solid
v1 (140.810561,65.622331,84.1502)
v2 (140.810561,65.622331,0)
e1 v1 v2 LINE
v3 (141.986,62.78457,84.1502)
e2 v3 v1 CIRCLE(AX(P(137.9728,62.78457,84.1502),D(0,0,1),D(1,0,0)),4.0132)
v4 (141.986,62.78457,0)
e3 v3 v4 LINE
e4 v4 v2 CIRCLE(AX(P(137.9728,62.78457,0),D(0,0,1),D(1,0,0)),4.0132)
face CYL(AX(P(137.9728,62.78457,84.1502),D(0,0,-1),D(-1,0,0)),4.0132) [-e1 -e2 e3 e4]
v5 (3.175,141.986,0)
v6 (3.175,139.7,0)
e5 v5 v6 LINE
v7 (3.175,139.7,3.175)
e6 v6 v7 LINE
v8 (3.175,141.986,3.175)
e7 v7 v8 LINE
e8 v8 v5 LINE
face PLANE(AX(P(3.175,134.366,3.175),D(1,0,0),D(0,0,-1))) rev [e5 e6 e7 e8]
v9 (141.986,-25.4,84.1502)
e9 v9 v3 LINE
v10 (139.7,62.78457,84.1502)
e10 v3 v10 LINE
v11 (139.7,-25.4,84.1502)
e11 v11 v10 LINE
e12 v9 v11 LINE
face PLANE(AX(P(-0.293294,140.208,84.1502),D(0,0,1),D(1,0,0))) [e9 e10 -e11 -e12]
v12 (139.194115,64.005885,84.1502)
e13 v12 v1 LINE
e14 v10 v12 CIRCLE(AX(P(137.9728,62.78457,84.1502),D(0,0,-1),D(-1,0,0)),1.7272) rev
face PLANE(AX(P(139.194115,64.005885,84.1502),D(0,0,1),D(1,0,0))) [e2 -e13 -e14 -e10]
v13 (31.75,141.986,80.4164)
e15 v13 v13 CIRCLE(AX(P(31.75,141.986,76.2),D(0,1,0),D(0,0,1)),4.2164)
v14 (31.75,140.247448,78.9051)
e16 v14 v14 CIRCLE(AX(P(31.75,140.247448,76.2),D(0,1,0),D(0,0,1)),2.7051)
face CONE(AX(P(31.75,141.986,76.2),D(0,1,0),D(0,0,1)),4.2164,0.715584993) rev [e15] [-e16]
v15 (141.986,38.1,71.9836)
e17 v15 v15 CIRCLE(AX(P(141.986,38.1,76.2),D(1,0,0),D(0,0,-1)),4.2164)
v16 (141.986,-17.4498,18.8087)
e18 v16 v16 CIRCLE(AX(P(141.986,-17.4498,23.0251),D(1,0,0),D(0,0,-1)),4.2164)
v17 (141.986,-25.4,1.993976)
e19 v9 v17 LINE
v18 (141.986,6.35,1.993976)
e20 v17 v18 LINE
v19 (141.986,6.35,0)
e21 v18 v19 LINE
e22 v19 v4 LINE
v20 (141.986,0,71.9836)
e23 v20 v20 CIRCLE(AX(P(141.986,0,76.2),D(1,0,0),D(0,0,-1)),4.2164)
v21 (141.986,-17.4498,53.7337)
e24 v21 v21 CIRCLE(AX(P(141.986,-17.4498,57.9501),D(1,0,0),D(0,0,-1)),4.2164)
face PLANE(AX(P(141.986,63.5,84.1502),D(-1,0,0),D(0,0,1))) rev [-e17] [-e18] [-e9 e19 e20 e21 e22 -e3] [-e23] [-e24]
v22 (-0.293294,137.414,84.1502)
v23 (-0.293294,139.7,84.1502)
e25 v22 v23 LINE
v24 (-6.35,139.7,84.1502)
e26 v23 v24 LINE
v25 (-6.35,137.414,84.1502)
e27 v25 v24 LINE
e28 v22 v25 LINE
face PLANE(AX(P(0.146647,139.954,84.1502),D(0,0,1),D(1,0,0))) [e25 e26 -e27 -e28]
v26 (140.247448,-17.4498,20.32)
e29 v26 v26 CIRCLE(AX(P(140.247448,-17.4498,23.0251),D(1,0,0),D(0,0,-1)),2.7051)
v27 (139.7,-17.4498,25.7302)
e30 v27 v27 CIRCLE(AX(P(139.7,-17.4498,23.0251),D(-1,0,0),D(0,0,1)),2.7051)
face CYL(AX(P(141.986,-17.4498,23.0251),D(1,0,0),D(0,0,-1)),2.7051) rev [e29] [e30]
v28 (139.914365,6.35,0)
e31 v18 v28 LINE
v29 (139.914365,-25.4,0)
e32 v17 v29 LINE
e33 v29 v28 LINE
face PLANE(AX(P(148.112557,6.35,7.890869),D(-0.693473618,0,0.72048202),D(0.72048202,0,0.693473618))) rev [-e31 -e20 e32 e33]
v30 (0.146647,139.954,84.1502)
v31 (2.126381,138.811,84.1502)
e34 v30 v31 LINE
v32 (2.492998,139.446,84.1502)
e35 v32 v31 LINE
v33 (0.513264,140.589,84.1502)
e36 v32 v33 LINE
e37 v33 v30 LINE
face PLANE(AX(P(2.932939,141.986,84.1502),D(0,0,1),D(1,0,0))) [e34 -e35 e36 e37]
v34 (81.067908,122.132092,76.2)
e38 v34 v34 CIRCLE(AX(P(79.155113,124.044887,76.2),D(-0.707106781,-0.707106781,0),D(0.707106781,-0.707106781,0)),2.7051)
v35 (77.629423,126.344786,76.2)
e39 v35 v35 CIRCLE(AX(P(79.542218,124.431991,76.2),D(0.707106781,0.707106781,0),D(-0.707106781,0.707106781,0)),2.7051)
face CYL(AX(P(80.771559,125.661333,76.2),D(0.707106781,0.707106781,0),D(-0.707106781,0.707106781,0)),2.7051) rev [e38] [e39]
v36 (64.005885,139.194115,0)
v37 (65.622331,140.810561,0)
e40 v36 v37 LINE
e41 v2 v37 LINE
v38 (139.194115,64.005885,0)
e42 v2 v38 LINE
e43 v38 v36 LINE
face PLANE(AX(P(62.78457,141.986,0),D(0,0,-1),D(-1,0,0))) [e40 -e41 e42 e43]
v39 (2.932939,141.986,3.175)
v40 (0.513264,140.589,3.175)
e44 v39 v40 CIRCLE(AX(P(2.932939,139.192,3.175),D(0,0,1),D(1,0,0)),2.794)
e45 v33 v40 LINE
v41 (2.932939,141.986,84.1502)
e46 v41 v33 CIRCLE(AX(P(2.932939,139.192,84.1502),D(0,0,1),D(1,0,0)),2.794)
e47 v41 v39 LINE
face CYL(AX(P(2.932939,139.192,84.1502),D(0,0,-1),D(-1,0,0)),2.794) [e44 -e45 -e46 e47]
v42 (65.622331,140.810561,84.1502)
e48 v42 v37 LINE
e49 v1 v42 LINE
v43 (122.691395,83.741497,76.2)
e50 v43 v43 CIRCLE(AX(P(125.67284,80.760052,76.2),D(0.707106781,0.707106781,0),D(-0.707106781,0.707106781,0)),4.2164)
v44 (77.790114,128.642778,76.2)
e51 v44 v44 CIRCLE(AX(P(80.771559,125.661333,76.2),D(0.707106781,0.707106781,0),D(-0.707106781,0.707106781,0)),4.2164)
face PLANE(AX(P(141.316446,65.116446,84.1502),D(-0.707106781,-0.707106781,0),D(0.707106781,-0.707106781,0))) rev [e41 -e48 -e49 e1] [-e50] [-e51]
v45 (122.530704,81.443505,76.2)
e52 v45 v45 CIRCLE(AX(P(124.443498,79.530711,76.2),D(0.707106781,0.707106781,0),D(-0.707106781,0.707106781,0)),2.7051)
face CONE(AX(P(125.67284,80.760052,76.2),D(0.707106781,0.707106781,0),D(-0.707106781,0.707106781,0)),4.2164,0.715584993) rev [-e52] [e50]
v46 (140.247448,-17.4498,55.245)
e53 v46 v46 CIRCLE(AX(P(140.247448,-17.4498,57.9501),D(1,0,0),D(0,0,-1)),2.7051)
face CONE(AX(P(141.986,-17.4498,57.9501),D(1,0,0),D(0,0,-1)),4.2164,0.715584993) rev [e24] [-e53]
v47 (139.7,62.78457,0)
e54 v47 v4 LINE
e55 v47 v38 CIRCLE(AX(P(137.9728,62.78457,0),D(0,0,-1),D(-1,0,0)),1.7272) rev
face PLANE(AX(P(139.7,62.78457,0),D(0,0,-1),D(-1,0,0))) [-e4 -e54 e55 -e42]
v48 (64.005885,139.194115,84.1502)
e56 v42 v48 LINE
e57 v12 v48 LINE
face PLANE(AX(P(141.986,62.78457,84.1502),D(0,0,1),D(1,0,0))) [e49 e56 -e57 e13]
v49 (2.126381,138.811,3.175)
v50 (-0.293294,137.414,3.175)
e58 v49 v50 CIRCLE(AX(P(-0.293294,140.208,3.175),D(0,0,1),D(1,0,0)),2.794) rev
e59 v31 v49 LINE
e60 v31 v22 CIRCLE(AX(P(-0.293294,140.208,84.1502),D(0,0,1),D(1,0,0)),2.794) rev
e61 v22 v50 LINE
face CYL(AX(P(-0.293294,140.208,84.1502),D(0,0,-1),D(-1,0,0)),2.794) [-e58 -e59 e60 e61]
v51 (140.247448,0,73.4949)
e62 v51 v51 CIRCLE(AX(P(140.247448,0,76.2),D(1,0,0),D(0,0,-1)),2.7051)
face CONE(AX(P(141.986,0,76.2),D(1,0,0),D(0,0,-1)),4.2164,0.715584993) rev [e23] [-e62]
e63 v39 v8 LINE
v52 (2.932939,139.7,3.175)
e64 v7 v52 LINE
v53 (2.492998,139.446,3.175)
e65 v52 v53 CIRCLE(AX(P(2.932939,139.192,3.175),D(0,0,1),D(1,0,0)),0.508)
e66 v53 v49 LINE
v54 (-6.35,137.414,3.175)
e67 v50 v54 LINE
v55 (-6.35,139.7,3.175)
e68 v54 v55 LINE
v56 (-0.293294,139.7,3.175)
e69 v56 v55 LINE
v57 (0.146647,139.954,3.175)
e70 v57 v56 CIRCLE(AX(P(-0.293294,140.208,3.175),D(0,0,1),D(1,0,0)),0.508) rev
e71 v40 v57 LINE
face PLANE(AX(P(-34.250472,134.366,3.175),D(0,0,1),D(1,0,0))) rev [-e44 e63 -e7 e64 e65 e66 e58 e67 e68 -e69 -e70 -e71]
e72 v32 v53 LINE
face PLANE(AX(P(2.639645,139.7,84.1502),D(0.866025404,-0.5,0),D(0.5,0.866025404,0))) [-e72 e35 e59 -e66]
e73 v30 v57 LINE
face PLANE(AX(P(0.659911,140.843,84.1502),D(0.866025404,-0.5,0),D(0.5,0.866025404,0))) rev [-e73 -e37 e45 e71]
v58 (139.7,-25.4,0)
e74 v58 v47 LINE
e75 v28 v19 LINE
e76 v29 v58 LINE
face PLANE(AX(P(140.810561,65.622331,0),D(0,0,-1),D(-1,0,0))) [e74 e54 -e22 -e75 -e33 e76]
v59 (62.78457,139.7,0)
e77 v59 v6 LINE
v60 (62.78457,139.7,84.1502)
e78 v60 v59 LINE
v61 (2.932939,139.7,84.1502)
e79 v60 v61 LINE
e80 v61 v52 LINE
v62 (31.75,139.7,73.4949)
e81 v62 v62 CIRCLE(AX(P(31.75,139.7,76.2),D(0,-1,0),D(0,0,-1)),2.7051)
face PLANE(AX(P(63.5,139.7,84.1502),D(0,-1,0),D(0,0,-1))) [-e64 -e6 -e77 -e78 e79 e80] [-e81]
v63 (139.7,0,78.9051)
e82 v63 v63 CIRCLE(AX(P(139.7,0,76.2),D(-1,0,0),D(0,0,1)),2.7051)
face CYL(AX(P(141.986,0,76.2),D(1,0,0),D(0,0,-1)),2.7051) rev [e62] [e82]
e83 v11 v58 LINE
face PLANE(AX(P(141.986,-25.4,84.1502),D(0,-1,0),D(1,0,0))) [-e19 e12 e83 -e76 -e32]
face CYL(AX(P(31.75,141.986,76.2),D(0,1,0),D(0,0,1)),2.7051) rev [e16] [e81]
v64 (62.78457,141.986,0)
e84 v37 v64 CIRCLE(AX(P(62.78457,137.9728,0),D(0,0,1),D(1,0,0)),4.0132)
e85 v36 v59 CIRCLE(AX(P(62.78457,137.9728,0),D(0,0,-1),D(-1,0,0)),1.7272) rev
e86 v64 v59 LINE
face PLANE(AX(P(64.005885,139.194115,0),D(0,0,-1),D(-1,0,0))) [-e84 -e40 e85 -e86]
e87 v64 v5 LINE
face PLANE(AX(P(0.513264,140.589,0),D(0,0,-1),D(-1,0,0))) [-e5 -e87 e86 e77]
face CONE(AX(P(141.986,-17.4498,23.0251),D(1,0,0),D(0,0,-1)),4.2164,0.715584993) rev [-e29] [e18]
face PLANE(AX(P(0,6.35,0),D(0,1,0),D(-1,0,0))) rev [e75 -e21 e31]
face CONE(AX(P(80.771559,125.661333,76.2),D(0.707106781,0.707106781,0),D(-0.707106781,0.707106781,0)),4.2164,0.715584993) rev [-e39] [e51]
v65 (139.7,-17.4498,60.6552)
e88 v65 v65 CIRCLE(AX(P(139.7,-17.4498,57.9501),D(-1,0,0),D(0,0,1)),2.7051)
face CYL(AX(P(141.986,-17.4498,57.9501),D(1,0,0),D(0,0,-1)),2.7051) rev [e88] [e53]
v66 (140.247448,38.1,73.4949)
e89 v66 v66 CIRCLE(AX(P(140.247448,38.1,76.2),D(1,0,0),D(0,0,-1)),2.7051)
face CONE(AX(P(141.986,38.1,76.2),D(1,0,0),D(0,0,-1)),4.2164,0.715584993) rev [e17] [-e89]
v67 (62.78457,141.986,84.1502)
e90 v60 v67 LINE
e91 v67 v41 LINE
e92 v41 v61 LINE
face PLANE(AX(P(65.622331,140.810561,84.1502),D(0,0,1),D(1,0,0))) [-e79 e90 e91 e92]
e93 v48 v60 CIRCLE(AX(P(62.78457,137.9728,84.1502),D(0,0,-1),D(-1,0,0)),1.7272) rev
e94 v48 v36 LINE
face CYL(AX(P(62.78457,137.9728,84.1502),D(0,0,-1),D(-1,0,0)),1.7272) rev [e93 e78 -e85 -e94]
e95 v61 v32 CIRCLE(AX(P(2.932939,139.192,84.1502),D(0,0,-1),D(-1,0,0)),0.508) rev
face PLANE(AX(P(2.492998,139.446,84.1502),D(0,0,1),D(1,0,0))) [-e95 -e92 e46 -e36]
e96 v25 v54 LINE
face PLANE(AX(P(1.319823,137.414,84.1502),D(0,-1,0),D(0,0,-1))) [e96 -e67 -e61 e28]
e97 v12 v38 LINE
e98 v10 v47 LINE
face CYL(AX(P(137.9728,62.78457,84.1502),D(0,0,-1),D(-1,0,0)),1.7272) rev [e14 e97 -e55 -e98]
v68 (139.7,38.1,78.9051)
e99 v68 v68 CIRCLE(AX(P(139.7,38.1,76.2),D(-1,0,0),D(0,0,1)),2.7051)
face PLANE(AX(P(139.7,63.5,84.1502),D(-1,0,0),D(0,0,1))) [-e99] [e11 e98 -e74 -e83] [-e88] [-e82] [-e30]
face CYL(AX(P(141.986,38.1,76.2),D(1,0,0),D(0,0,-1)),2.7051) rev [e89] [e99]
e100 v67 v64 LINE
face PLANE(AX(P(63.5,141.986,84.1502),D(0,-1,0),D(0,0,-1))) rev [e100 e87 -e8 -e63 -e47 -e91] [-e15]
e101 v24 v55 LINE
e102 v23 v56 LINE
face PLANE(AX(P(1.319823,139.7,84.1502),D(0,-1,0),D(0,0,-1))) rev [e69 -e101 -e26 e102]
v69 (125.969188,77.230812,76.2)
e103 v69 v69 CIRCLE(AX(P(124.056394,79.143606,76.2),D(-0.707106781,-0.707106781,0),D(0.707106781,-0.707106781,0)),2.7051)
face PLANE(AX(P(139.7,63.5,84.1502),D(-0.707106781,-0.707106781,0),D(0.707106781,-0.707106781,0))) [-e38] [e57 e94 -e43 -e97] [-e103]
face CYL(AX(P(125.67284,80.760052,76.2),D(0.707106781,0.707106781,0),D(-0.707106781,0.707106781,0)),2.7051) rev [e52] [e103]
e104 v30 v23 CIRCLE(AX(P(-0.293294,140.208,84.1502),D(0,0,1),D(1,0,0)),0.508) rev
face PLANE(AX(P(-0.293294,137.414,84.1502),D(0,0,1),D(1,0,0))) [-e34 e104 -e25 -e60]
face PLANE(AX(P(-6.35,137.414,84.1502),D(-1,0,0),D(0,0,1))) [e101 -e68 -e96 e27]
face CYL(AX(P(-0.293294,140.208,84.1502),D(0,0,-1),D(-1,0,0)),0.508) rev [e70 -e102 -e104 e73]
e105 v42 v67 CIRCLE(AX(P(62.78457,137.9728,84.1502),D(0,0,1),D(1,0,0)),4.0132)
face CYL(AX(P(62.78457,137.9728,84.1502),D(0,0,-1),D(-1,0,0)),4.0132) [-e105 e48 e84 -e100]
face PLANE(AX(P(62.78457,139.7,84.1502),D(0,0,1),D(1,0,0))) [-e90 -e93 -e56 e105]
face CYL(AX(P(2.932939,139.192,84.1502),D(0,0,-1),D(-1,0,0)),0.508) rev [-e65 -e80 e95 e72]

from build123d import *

# Parameters (mm, degrees)
BASE_FLANGE1_DEPTH                            = 84.1502
CSK_FOR_8_FLAT_HEAD_MACHINE_SCREW1_AT_2_COUNT = 2
CSK_FOR_8_FLAT_HEAD_MACHINE_SCREW1_AT_2_PITCH = 34.925
CSK_FOR_8_FLAT_HEAD_MACHINE_SCREW2_AT_2_COUNT = 2
CSK_FOR_8_FLAT_HEAD_MACHINE_SCREW2_AT_2_PITCH = 38.1
CSK_FOR_8_FLAT_HEAD_MACHINE_SCREW3_AT_2_COUNT = 2
CSK_FOR_8_FLAT_HEAD_MACHINE_SCREW3_AT_2_PITCH = 63.5
SKETCH13_W                                    = 37.425471778
SKETCH13_H                                    = 23.818222608
CUT_EXTRUDE2_DEPTH                            = 7.62
CUT_EXTRUDE3_DEPTH                            = 31.75


# Read off the part's stored shape, not the designer's step: Base-Flange1
with BuildPart() as part:
    # Base-Flange1 outline → Base-Flange1 (new body)
    with BuildSketch(Plane.XY):
        with BuildLine():
            Line((-0.293293937, 139.7), (-6.35, 139.7))
            Line((-6.35, 139.7), (-6.35, 137.414))
            Line((-6.35, 137.414), (-0.293293937, 137.414))
            ThreePointArc((-0.293293937, 137.414), (1.103706063, 137.788325022), (2.126381041, 138.811))
            Line((2.126381041, 138.811), (2.492998462, 139.446))
            ThreePointArc((2.492998462, 139.446), (2.678939367, 139.631940905), (2.932939367, 139.7))
            Line((2.932939367, 139.7), (62.784570335, 139.7))
            ThreePointArc((62.784570335, 139.7), (63.44554116, 139.568524729), (64.005885168, 139.194114832))
            Line((64.005885168, 139.194114832), (139.194114832, 64.005885168))
            ThreePointArc((139.194114832, 64.005885168), (139.568524729, 63.44554116), (139.7, 62.784570335))
            Line((139.7, 62.784570335), (139.7, -25.4))
            Line((139.7, -25.4), (141.986, -25.4))
            Line((141.986, -25.4), (141.986, 62.784570335))
            ThreePointArc((141.986, 62.784570335), (141.68051334, 64.320355486), (140.810560934, 65.622331269))
            Line((140.810560934, 65.622331269), (65.622331269, 140.810560934))
            ThreePointArc((65.622331269, 140.810560934), (64.320355486, 141.68051334), (62.784570335, 141.986))
            Line((62.784570335, 141.986), (2.932939367, 141.986))
            ThreePointArc((2.932939367, 141.986), (1.535939367, 141.611674978), (0.513264389, 140.589))
            Line((0.513264389, 140.589), (0.146646968, 139.954))
            ThreePointArc((0.146646968, 139.954), (-0.039293937, 139.768059095), (-0.293293937, 139.7))
        make_face()
    extrude(amount=BASE_FLANGE1_DEPTH)

    # Sketch2 → CSK for #8 Flat Head Machine Screw1 (revolve, cut)
    with BuildSketch(Plane(origin=(141.986, -17.4498, 57.9501), x_dir=(0, 0, -1), z_dir=(0, 1, 0))):
        Polygon((0, 0), (0, 2.286), (2.7051, 2.286), (2.7051, 1.738551774), (4.2164, 0), align=None)
    csk_for_8_flat_head_machine_screw1 = revolve(axis=Axis((148.336, -17.4498, 57.9501), (-1, 0, 0)), mode=Mode.SUBTRACT)

    # CSK for #8 Flat Head Machine Screw1 at 2: CSK for #8 Flat Head Machine Screw1 ×2
    with Locations(*[(0, 0, -i * CSK_FOR_8_FLAT_HEAD_MACHINE_SCREW1_AT_2_PITCH) for i in range(1, CSK_FOR_8_FLAT_HEAD_MACHINE_SCREW1_AT_2_COUNT)]):
        add(csk_for_8_flat_head_machine_screw1, mode=Mode.SUBTRACT)

    # Sketch6 → CSK for #8 Flat Head Machine Screw2 (revolve, cut)
    with BuildSketch(Plane(origin=(141.986, 0, 76.2), x_dir=(0, 0, -1), z_dir=(0, 1, 0))):
        Polygon((0, 0), (0, 2.286), (2.7051, 2.286), (2.7051, 1.738551774), (4.2164, 0), align=None)
    csk_for_8_flat_head_machine_screw2 = revolve(axis=Axis((148.336, 0, 76.2), (-1, 0, 0)), mode=Mode.SUBTRACT)

    # CSK for #8 Flat Head Machine Screw2 at 2: CSK for #8 Flat Head Machine Screw2 ×2
    with Locations(*[(0, i * CSK_FOR_8_FLAT_HEAD_MACHINE_SCREW2_AT_2_PITCH, 0) for i in range(1, CSK_FOR_8_FLAT_HEAD_MACHINE_SCREW2_AT_2_COUNT)]):
        add(csk_for_8_flat_head_machine_screw2, mode=Mode.SUBTRACT)

    # Sketch8 → CSK for #8 Flat Head Machine Screw3 (revolve, cut)
    with BuildSketch(Plane(origin=(125.672839939, 80.760052265, 76.2), x_dir=(-0.707106781186544, 0.7071067811865511, 0), z_dir=(0, 0, 1))):
        Polygon((0, 0), (0, 2.286), (2.7051, 2.286), (2.7051, 1.738551774), (4.2164, 0), align=None)
    csk_for_8_flat_head_machine_screw3 = revolve(axis=Axis((130.162967999, 85.250180325, 76.2), (-0.707106781186551, -0.707106781186544, 0)), mode=Mode.SUBTRACT)

    # CSK for #8 Flat Head Machine Screw3 at 2: CSK for #8 Flat Head Machine Screw3 ×2
    with Locations(*[Vector(-0.707106781186544, 0.707106781186551, 0) * (i * CSK_FOR_8_FLAT_HEAD_MACHINE_SCREW3_AT_2_PITCH) for i in range(1, CSK_FOR_8_FLAT_HEAD_MACHINE_SCREW3_AT_2_COUNT)]):
        add(csk_for_8_flat_head_machine_screw3, mode=Mode.SUBTRACT)

    # Sketch10 → CSK for #8 Flat Head Machine Screw4 (revolve, cut)
    with BuildSketch(Plane(origin=(31.75, 141.986, 76.2), x_dir=(0, 0, 1), z_dir=(1, 0, 0))):
        Polygon((0, 0), (0, 2.286), (2.7051, 2.286), (2.7051, 1.738551774), (4.2164, 0), align=None)
    revolve(axis=Axis((31.75, 148.336, 76.2), (0, -1, 0)), mode=Mode.SUBTRACT)

    # Sketch13 → Cut-Extrude2 (cut)
    with BuildSketch(Plane(origin=(0, 141.986, 0), x_dir=(1, 0, 0), z_dir=(0, 1, 0))):
        with Locations((-15.537735889, 8.734111304)):
            Rectangle(SKETCH13_W, SKETCH13_H)
    extrude(amount=-CUT_EXTRUDE2_DEPTH, mode=Mode.SUBTRACT)

    # Sketch14 → Cut-Extrude3 (cut)
    with BuildSketch(Plane.XZ.offset(25.4)):
        Polygon((148.11255662, 7.890869199), (135.614154543, -4.139010601), (148.11255662, -4.61665654), align=None)
    extrude(amount=-CUT_EXTRUDE3_DEPTH, mode=Mode.SUBTRACT)


solid = part.part
